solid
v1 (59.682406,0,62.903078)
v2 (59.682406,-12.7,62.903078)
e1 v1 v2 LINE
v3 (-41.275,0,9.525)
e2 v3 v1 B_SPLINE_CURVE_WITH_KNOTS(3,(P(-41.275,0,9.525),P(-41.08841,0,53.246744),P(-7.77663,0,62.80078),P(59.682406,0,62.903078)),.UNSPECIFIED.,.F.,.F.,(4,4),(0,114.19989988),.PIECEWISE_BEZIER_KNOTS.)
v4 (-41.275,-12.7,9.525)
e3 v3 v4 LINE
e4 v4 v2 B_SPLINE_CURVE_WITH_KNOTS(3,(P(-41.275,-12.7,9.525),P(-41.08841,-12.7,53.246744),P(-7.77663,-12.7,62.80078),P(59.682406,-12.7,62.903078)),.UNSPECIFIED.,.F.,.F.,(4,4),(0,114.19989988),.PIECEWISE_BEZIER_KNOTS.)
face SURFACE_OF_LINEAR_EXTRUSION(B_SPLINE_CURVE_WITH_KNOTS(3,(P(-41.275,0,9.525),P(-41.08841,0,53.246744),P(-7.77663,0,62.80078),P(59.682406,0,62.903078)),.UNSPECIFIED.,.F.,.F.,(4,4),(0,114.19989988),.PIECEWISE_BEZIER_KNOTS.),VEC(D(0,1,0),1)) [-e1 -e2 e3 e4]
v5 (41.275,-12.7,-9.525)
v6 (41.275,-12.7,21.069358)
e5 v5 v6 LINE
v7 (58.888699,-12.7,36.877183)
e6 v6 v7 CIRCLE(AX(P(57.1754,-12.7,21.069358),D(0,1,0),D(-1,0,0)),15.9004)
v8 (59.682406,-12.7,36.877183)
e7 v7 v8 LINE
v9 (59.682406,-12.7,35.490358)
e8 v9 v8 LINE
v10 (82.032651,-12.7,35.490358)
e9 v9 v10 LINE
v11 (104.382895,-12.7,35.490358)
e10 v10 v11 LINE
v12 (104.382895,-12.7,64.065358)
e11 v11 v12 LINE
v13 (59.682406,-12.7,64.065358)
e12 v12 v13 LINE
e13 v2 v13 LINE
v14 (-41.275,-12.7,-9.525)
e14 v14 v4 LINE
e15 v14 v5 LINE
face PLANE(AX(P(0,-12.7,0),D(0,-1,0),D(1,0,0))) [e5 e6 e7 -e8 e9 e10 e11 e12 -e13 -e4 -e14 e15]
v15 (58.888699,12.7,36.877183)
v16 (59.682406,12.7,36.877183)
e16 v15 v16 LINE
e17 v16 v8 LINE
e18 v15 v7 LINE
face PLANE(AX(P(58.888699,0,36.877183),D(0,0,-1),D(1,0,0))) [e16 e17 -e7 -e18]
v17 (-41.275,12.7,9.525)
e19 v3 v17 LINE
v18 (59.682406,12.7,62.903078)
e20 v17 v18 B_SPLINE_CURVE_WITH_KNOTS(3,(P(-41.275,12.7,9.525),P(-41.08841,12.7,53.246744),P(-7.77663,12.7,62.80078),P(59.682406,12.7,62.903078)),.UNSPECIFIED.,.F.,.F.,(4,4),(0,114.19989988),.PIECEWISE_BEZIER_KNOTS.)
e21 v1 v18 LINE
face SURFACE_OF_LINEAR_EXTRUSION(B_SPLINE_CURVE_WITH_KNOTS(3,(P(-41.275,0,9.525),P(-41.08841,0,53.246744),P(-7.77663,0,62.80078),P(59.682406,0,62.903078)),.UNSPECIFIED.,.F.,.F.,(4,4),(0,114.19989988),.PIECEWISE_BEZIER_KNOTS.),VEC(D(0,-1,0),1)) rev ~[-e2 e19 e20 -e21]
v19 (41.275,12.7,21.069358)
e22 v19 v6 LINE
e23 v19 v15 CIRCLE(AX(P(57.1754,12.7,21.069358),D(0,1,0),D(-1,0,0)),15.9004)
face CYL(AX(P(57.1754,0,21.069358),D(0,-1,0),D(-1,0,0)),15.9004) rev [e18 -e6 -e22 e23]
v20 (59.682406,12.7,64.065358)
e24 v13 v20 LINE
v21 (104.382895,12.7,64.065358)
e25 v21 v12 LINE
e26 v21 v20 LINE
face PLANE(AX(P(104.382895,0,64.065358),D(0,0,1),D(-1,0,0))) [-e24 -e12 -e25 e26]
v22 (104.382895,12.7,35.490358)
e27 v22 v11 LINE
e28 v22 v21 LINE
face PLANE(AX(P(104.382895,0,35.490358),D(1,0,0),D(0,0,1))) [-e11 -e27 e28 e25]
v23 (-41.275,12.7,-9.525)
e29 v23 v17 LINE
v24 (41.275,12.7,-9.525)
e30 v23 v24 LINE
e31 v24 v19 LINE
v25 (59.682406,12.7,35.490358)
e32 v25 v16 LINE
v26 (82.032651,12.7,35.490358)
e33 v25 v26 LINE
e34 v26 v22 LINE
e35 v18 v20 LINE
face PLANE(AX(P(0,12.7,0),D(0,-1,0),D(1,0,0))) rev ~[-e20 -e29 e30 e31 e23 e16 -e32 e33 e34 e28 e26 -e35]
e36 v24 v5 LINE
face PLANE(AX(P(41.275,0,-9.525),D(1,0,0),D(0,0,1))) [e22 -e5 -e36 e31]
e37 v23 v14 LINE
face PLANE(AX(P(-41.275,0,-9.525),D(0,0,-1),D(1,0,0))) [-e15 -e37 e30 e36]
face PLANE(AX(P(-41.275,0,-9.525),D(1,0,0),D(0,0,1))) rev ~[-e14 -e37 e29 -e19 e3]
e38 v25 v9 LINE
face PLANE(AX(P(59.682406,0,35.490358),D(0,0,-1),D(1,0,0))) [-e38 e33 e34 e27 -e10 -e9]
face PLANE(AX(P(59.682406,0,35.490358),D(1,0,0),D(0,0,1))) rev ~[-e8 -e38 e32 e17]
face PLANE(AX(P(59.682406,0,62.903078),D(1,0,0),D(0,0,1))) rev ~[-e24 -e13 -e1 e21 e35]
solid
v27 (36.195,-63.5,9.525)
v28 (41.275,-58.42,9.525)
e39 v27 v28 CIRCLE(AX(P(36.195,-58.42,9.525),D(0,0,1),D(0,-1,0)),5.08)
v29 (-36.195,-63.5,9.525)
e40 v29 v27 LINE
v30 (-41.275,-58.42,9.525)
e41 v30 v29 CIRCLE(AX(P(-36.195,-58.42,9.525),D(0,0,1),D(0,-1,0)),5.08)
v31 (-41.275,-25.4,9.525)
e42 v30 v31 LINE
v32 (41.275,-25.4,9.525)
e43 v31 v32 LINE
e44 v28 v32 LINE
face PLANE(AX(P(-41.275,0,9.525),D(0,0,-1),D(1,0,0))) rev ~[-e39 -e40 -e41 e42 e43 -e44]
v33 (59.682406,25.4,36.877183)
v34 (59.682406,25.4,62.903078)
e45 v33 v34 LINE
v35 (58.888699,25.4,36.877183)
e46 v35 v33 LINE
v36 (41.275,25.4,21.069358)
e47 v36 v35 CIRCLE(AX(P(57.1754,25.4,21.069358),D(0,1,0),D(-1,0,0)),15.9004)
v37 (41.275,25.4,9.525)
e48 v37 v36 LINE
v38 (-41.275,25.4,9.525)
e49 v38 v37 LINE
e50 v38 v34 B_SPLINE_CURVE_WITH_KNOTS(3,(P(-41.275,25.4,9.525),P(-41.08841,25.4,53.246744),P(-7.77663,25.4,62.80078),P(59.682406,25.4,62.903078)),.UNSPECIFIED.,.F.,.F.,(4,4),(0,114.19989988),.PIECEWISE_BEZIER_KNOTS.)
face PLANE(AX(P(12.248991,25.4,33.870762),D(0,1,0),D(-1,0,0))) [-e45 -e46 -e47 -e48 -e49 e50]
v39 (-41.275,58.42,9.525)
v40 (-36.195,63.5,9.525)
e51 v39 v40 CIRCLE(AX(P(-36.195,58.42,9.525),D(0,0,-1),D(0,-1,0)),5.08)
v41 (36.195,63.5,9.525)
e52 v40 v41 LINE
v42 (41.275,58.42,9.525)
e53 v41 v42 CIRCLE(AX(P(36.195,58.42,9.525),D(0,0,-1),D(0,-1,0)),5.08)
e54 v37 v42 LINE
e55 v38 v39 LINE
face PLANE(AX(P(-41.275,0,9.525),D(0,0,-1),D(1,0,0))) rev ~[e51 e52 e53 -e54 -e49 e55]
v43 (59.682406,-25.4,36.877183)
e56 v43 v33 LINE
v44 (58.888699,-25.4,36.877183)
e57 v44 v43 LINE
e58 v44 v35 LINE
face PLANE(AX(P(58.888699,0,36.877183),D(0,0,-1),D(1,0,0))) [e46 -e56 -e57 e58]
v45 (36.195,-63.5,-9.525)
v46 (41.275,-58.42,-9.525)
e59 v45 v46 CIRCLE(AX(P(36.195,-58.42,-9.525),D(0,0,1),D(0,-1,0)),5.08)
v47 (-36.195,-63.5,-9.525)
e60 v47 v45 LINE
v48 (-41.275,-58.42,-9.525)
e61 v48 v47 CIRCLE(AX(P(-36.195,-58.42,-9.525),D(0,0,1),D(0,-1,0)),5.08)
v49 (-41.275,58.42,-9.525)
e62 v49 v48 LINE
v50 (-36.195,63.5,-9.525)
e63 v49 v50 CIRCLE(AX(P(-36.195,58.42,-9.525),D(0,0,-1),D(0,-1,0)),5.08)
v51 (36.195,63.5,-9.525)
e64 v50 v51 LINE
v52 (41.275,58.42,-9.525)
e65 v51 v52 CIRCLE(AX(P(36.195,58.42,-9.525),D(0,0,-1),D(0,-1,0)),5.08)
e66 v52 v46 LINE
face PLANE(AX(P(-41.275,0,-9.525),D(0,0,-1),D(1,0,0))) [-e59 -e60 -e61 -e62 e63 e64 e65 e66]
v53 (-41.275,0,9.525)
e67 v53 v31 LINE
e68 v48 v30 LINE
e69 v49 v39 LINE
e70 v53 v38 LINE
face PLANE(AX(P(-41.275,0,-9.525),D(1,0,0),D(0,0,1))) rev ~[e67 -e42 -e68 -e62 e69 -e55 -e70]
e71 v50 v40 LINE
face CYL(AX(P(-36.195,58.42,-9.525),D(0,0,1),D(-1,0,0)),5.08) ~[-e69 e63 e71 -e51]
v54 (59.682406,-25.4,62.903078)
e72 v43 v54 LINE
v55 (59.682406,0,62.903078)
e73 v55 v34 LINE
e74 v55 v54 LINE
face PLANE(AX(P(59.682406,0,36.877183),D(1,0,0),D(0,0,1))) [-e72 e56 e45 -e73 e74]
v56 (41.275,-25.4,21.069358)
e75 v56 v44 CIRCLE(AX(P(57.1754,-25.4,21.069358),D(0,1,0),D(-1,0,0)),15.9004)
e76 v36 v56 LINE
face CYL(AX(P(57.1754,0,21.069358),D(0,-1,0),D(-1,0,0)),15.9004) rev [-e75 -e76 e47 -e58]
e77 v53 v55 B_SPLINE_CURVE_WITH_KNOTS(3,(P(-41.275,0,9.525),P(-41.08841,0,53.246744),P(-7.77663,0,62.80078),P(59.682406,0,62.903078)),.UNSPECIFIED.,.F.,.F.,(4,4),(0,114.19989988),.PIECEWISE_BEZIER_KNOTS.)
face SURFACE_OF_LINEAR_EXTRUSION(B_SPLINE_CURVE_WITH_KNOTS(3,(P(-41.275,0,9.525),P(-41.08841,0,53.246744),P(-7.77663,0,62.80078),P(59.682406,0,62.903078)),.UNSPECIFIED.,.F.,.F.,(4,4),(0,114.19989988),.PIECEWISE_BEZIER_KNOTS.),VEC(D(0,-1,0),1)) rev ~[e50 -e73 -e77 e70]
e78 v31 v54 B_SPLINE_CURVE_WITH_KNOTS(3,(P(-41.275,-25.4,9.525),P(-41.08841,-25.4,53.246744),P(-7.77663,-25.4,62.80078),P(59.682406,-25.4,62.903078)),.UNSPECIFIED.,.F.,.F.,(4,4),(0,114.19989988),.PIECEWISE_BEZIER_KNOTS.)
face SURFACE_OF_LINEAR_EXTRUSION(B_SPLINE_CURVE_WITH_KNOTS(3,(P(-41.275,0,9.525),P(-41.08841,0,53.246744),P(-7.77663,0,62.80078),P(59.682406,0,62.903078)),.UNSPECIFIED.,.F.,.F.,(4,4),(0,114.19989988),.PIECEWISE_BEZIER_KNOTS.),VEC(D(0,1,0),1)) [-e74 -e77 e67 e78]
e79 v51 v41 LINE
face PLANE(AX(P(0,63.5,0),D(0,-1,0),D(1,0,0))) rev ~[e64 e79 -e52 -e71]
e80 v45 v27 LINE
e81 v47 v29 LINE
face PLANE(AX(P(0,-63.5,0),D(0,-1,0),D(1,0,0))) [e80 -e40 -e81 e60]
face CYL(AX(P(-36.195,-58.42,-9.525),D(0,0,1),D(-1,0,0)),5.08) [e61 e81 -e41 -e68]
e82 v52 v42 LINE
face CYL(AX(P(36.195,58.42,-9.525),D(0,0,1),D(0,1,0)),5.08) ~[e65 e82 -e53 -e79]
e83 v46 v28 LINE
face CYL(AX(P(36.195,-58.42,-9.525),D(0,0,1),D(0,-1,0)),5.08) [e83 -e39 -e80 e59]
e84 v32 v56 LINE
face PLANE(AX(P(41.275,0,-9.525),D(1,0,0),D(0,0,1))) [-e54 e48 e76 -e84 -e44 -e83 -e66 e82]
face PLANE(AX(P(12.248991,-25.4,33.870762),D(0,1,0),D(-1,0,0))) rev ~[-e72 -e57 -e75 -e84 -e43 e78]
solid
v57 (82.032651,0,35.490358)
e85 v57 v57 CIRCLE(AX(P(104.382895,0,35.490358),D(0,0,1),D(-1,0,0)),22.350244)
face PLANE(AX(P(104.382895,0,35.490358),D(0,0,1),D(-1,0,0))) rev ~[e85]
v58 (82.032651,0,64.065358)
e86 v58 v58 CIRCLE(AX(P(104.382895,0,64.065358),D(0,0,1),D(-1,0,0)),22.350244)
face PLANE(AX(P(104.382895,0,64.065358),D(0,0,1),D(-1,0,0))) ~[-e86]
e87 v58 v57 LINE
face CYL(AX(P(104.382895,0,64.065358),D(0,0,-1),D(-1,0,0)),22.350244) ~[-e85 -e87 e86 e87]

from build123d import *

# Parameters (mm, degrees)
F0_W     = 82.55
F0_H     = 19.05
F1_DEPTH = 63.5
F2_DEPTH = 25.4
F4_R     = 5.08
F0_W_2   = 22.3502442241
F0_H_2   = 26.0258951836
F0_H_3   = 1.1622799838
F0_H_4   = 1.3868248326
F5_DEPTH = 12.7


# Not quite as in the source:
# - a feature names something its author has since deleted; it is built from what else it names


with BuildPart() as f1:
    # F0 (on Front) → F1 (new body, symmetric)
    with BuildSketch(Plane.XZ):
        Rectangle(F0_W, F0_H)
    extrude(amount=F1_DEPTH, both=True)

    # F0 (on Front) → F2 (join, symmetric)
    with BuildSketch(Plane.XZ):
        with BuildLine():
            add(Edge.make_bspline(
                [(-41.275, 9.525), (-41.0884097219, 53.2467439771), (-7.776630111, 62.8007799387), (59.6824064851, 62.9030779754)],
                knots=[0, 0, 0, 0, 114.1998998798, 114.1998998798, 114.1998998798, 114.1998998798], degree=3))
            Line((-41.275, 9.525), (41.275, 9.525))
            Line((41.275, 9.525), (41.275, 21.0693579674))
            ThreePointArc((41.275, 21.0693579674), (46.5551227902, 32.9028879626), (58.8886992965, 36.8771827918))
            Line((58.8886992965, 36.8771827918), (59.6824064851, 36.8771827918))
            Line((59.6824064851, 36.8771827918), (59.6824064851, 62.9030779754))
        make_face()
    extrude(amount=F2_DEPTH, both=True)

    # F4
    f4_edges = [f1.edges().sort_by_distance(p)[0] for p in [
        (41.275, -63.5, 0),
        (-41.275, -63.5, 0),
        (41.275, 63.5, 0),
        (-41.275, 63.5, 0),
    ]]
    fillet(f4_edges, radius=F4_R)


with BuildPart() as f3:
    # F0 (on Front) → F3 (revolve)
    with BuildSketch(Plane.XZ):
        Polygon((82.0326507092, 64.0653579593), (82.0326507092, 62.9030779754), (82.0326507092, 36.8771827918), (82.0326507092, 35.4903579593), (104.3828949332, 35.4903579593), (104.3828949332, 64.0653579593), align=None)
    revolve(axis=Axis((104.3828949332, 0, 49.7778579593), (0, 0, 1)))


with BuildPart() as f5:
    # F0 (on Front) → F5 (new body, symmetric)
    with BuildSketch(Plane.XZ):
        Rectangle(F0_W, F0_H)
        with BuildLine():
            add(Edge.make_bspline(
                [(-41.275, 9.525), (-41.0884097219, 53.2467439771), (-7.776630111, 62.8007799387), (59.6824064851, 62.9030779754)],
                knots=[0, 0, 0, 0, 114.1998998798, 114.1998998798, 114.1998998798, 114.1998998798], degree=3))
            Line((-41.275, 9.525), (41.275, 9.525))
            Line((41.275, 9.525), (41.275, 21.0693579674))
            ThreePointArc((41.275, 21.0693579674), (46.5551227902, 32.9028879626), (58.8886992965, 36.8771827918))
            Line((58.8886992965, 36.8771827918), (59.6824064851, 36.8771827918))
            Line((59.6824064851, 36.8771827918), (59.6824064851, 62.9030779754))
        make_face()
        with Locations((70.8575285971, 49.8901303836)):
            Rectangle(F0_W_2, F0_H_2)
        with Locations((70.8575285971, 63.4842179674)):
            Rectangle(F0_W_2, F0_H_3)
        with Locations((70.8575285971, 36.1837703755)):
            Rectangle(F0_W_2, F0_H_4)
        Polygon((82.0326507092, 64.0653579593), (82.0326507092, 62.9030779754), (82.0326507092, 36.8771827918), (82.0326507092, 35.4903579593), (104.3828949332, 35.4903579593), (104.3828949332, 64.0653579593), align=None)
    extrude(amount=F5_DEPTH, both=True)


solid = Compound([f1.part, f3.part, f5.part])
